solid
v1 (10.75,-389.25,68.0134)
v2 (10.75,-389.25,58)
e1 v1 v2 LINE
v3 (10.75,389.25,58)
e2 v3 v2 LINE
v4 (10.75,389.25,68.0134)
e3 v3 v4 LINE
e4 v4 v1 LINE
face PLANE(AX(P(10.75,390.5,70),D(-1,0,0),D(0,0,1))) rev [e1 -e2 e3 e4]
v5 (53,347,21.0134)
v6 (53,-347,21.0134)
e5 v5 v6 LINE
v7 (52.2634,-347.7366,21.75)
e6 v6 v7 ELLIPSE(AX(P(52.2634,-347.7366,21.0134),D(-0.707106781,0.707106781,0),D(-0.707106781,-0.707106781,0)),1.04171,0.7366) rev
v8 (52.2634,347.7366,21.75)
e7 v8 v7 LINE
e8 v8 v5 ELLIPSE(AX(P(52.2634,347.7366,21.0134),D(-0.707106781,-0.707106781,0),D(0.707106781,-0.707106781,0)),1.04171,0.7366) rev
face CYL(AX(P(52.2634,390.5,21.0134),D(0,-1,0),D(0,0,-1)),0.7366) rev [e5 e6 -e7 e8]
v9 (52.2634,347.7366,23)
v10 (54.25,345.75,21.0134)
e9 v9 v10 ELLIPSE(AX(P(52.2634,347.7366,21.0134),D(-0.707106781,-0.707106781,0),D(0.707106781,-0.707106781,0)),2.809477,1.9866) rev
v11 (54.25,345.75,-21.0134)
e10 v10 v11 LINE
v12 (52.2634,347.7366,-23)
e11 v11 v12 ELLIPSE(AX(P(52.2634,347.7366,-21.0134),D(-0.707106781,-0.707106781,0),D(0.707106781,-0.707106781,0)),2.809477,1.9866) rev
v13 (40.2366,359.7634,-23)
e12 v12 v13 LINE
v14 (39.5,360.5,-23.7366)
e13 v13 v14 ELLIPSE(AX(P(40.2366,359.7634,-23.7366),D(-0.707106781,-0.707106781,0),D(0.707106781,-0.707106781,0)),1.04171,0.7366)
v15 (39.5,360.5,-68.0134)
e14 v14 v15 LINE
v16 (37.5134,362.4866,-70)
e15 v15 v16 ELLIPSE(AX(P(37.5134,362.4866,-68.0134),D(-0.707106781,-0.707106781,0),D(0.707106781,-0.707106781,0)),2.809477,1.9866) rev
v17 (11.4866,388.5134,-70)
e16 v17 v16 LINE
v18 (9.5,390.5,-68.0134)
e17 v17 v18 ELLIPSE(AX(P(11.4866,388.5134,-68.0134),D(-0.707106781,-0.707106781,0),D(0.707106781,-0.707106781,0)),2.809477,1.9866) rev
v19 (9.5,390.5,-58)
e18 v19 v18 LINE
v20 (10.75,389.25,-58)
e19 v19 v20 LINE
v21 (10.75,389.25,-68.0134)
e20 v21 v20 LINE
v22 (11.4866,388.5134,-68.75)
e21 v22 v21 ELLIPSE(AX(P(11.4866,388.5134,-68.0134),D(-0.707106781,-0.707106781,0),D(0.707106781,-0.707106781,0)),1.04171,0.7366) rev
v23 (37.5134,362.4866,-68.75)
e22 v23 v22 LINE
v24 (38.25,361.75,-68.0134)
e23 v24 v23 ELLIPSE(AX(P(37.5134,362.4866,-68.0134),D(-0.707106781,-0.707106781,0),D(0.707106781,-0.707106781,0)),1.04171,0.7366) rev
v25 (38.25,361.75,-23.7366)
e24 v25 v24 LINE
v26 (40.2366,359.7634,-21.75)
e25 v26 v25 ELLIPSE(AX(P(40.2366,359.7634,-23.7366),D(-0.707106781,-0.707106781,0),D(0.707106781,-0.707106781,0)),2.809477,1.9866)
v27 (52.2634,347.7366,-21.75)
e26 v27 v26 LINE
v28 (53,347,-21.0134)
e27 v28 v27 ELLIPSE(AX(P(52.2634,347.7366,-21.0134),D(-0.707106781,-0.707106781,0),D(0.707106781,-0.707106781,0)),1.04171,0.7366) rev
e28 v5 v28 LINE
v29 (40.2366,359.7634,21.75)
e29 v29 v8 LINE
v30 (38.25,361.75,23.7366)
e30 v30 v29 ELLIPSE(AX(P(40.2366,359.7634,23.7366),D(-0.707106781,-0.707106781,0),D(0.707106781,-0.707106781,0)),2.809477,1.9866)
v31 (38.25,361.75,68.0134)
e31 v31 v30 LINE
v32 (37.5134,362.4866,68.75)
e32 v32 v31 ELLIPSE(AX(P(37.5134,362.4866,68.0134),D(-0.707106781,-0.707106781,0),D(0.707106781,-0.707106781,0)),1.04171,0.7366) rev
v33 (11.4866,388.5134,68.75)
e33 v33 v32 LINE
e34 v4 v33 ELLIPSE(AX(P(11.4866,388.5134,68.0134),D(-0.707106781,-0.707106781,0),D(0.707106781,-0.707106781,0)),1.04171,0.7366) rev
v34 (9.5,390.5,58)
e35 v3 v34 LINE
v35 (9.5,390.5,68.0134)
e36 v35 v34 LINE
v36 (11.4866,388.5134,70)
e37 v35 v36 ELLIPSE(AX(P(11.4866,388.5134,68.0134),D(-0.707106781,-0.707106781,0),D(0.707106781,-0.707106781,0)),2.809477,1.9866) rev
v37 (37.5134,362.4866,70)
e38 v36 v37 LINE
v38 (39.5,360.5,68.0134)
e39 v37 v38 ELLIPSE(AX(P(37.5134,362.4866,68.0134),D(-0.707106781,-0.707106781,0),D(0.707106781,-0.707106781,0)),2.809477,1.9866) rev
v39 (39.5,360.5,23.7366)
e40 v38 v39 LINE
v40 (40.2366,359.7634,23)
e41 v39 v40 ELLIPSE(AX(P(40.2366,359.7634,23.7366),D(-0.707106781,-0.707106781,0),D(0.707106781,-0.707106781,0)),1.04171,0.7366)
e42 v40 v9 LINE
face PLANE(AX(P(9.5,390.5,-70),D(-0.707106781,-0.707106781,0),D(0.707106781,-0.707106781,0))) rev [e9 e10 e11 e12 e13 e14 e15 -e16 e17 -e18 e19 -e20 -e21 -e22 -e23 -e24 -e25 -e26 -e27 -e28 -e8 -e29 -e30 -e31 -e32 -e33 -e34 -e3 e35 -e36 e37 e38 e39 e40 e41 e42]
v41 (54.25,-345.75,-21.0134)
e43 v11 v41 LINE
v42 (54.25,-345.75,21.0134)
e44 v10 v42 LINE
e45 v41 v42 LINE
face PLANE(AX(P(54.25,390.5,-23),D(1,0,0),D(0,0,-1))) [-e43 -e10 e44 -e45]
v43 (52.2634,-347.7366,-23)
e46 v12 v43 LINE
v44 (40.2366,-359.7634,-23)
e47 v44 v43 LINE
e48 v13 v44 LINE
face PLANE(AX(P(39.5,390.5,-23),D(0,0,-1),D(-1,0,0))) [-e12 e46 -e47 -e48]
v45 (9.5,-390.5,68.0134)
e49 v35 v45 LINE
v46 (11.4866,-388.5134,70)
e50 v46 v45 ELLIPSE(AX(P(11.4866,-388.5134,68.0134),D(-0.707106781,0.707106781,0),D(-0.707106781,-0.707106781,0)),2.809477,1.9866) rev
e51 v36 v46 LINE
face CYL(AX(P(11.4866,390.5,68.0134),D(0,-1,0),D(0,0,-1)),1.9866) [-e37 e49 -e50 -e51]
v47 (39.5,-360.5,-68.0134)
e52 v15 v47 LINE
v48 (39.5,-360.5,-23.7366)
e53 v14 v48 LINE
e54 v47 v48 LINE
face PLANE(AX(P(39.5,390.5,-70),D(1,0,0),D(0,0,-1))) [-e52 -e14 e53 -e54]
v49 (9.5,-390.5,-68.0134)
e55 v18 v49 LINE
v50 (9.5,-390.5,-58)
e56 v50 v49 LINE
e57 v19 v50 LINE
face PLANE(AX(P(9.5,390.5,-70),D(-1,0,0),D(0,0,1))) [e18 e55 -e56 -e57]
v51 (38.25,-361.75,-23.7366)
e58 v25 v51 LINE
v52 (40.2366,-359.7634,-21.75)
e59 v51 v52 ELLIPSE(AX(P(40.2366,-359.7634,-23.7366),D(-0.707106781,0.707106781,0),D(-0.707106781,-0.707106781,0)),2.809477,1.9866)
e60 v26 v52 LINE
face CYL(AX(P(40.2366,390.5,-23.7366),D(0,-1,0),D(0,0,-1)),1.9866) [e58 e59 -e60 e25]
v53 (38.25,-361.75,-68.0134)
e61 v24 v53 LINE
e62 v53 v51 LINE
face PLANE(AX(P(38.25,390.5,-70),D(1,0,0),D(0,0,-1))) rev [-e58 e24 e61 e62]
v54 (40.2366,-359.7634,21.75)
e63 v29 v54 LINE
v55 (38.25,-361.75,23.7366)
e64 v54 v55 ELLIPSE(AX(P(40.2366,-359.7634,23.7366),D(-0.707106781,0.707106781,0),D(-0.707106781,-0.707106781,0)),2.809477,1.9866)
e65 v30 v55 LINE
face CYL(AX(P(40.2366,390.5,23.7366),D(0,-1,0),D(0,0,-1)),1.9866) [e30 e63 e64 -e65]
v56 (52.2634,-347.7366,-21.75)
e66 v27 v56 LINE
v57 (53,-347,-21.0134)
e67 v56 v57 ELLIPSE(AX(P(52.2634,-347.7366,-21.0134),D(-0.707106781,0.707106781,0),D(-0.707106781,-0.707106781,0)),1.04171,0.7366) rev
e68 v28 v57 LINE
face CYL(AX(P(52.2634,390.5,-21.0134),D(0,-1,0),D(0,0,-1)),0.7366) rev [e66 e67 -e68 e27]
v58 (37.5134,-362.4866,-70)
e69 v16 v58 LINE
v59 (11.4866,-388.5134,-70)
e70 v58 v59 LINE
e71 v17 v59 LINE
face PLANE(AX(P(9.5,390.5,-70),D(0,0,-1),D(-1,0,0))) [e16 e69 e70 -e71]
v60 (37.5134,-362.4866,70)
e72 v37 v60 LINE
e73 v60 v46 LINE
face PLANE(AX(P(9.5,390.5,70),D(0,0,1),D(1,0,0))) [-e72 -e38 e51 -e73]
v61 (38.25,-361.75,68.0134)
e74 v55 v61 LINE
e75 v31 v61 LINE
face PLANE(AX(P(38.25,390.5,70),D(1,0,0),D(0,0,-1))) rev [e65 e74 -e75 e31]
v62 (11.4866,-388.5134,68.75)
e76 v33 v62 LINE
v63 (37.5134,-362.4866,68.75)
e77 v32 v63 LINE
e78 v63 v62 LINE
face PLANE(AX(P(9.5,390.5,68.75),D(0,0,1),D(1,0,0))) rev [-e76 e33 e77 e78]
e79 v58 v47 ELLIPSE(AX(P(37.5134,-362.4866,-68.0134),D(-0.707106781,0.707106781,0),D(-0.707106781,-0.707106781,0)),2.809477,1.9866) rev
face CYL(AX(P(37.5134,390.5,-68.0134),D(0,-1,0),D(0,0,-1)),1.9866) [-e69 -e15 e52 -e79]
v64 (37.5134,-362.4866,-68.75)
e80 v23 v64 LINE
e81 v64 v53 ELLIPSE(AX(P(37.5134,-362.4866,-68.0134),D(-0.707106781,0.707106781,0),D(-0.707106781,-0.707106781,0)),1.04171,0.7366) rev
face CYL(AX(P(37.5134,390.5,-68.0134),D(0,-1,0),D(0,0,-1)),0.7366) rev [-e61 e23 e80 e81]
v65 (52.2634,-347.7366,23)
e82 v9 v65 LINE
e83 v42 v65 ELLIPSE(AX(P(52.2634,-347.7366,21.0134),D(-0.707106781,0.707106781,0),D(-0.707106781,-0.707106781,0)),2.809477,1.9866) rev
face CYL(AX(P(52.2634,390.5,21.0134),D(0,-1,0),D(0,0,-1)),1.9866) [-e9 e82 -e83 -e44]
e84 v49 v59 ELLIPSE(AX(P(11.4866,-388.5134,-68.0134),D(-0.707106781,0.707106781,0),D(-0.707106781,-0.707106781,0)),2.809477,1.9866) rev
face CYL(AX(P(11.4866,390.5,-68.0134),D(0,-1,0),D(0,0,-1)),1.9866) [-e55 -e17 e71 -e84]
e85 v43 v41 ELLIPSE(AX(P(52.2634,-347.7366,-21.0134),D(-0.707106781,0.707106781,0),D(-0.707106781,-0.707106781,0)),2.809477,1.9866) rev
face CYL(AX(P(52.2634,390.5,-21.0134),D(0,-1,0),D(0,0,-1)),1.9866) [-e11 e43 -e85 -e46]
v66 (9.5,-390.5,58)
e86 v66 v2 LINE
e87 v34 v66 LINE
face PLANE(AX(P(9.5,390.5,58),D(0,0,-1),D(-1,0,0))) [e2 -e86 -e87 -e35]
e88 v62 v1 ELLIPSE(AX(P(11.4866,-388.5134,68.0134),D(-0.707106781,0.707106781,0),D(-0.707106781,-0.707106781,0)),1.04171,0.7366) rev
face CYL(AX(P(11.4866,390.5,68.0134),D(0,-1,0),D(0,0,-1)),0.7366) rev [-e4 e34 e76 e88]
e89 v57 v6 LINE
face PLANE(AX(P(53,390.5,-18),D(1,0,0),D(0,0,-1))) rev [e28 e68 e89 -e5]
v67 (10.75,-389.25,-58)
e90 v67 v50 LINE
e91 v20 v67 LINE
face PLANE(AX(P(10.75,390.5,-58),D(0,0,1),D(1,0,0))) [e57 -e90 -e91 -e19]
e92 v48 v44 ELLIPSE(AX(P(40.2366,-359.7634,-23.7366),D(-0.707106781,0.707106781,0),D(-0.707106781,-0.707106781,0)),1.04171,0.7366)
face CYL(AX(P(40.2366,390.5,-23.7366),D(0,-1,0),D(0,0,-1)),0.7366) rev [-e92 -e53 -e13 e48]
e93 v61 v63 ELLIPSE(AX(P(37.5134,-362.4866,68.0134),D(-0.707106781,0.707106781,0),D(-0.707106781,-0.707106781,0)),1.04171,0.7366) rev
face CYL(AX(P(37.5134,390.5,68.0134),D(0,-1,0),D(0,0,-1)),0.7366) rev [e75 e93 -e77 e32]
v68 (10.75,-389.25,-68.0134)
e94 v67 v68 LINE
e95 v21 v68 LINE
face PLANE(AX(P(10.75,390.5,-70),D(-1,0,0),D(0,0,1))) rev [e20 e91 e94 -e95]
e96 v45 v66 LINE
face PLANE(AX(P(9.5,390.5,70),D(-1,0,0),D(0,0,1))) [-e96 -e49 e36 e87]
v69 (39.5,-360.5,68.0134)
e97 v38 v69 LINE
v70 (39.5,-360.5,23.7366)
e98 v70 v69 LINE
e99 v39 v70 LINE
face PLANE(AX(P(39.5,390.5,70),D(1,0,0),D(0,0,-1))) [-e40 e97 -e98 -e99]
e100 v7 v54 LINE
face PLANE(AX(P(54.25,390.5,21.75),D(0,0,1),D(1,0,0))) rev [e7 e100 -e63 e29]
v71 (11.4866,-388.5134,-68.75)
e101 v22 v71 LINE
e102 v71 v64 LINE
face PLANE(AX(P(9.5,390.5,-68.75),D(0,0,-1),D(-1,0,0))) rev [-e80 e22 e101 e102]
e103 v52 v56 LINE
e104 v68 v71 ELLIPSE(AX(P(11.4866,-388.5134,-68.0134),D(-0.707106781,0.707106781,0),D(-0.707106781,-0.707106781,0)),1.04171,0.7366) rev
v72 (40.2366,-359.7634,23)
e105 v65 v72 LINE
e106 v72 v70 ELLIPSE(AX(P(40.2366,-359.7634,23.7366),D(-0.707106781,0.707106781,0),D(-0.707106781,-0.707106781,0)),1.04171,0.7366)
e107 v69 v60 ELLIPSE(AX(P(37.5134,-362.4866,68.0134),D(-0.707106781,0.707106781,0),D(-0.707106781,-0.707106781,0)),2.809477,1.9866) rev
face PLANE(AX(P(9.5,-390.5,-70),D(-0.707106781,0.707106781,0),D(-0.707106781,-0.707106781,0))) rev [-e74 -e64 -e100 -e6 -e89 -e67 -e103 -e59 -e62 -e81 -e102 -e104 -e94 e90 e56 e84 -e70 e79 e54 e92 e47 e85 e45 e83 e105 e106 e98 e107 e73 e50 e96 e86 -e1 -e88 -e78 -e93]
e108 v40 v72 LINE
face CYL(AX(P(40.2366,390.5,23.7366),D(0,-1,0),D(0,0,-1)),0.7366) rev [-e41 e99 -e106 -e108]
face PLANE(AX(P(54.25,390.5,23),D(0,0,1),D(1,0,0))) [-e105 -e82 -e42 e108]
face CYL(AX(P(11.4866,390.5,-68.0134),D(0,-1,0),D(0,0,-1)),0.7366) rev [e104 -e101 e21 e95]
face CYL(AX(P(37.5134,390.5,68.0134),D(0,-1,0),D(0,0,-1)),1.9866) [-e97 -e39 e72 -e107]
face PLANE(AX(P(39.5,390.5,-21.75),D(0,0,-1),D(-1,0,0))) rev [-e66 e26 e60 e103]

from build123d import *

# Parameters (mm, degrees)
BASE_FLANGE1_DEPTH = 390.5
CUT_EXTRUDE2_DEPTH = 419.369827425


# Sheet-metal steps are written as plain solids
with BuildPart() as part:
    # Sketch1 → Base-Flange1 (new, symmetric)
    with BuildSketch(Plane(origin=(0, 0, 0), x_dir=(1, 0, 0), z_dir=(0, 1, 0))):
        with BuildLine():
            Line((9.5, 58), (9.5, 68.0134))
            ThreePointArc((9.5, 68.0134), (10.081861668, 69.418138332), (11.4866, 70))
            Line((11.4866, 70), (37.5134, 70))
            ThreePointArc((37.5134, 70), (38.918138332, 69.418138332), (39.5, 68.0134))
            Line((39.5, 68.0134), (39.5, 23.7366))
            ThreePointArc((39.5, 23.7366), (39.715745145, 23.215745145), (40.2366, 23))
            Line((40.2366, 23), (52.2634, 23))
            ThreePointArc((52.2634, 23), (53.668138332, 22.418138332), (54.25, 21.0134))
            Line((54.25, 21.0134), (54.25, 18))
            Line((54.25, 18), (54.25, -21.0134))
            ThreePointArc((54.25, -21.0134), (53.668138332, -22.418138332), (52.2634, -23))
            Line((52.2634, -23), (40.2366, -23))
            ThreePointArc((40.2366, -23), (39.715745145, -23.215745145), (39.5, -23.7366))
            Line((39.5, -23.7366), (39.5, -68.0134))
            ThreePointArc((39.5, -68.0134), (38.918138332, -69.418138332), (37.5134, -70))
            Line((37.5134, -70), (11.4866, -70))
            ThreePointArc((11.4866, -70), (10.081861668, -69.418138332), (9.5, -68.0134))
            Line((9.5, -68.0134), (9.5, -58))
            Line((9.5, -58), (10.75, -58))
            Line((10.75, -58), (10.75, -68.0134))
            ThreePointArc((10.75, -68.0134), (10.965745145, -68.534254855), (11.4866, -68.75))
            Line((11.4866, -68.75), (37.5134, -68.75))
            ThreePointArc((37.5134, -68.75), (38.034254855, -68.534254855), (38.25, -68.0134))
            Line((38.25, -68.0134), (38.25, -23.7366))
            ThreePointArc((38.25, -23.7366), (38.831861668, -22.331861668), (40.2366, -21.75))
            Line((40.2366, -21.75), (52.2634, -21.75))
            ThreePointArc((52.2634, -21.75), (52.784254855, -21.534254855), (53, -21.0134))
            Line((53, -21.0134), (53, 18))
            Line((53, 18), (53, 21.0134))
            ThreePointArc((53, 21.0134), (52.784254855, 21.534254855), (52.2634, 21.75))
            Line((52.2634, 21.75), (40.2366, 21.75))
            ThreePointArc((40.2366, 21.75), (38.831861668, 22.331861668), (38.25, 23.7366))
            Line((38.25, 23.7366), (38.25, 68.0134))
            ThreePointArc((38.25, 68.0134), (38.034254855, 68.534254855), (37.5134, 68.75))
            Line((37.5134, 68.75), (11.4866, 68.75))
            ThreePointArc((11.4866, 68.75), (10.965745145, 68.534254855), (10.75, 68.0134))
            Line((10.75, 68.0134), (10.75, 58))
            Line((10.75, 58), (9.5, 58))
        make_face()
    extrude(amount=BASE_FLANGE1_DEPTH, both=True)

    # Sketch2 → Cut-Extrude2 (cut, through all)
    with BuildSketch(Plane.XY.offset(70)):
        Polygon((9.5, -390.5), (204.29871247, -195.70128753), (123.087268974, -390.5), align=None)
        Polygon((123.087268974, 390.5), (9.5, 390.5), (204.29871247, 195.70128753), align=None)
    extrude(amount=-CUT_EXTRUDE2_DEPTH, mode=Mode.SUBTRACT)


solid = part.part
